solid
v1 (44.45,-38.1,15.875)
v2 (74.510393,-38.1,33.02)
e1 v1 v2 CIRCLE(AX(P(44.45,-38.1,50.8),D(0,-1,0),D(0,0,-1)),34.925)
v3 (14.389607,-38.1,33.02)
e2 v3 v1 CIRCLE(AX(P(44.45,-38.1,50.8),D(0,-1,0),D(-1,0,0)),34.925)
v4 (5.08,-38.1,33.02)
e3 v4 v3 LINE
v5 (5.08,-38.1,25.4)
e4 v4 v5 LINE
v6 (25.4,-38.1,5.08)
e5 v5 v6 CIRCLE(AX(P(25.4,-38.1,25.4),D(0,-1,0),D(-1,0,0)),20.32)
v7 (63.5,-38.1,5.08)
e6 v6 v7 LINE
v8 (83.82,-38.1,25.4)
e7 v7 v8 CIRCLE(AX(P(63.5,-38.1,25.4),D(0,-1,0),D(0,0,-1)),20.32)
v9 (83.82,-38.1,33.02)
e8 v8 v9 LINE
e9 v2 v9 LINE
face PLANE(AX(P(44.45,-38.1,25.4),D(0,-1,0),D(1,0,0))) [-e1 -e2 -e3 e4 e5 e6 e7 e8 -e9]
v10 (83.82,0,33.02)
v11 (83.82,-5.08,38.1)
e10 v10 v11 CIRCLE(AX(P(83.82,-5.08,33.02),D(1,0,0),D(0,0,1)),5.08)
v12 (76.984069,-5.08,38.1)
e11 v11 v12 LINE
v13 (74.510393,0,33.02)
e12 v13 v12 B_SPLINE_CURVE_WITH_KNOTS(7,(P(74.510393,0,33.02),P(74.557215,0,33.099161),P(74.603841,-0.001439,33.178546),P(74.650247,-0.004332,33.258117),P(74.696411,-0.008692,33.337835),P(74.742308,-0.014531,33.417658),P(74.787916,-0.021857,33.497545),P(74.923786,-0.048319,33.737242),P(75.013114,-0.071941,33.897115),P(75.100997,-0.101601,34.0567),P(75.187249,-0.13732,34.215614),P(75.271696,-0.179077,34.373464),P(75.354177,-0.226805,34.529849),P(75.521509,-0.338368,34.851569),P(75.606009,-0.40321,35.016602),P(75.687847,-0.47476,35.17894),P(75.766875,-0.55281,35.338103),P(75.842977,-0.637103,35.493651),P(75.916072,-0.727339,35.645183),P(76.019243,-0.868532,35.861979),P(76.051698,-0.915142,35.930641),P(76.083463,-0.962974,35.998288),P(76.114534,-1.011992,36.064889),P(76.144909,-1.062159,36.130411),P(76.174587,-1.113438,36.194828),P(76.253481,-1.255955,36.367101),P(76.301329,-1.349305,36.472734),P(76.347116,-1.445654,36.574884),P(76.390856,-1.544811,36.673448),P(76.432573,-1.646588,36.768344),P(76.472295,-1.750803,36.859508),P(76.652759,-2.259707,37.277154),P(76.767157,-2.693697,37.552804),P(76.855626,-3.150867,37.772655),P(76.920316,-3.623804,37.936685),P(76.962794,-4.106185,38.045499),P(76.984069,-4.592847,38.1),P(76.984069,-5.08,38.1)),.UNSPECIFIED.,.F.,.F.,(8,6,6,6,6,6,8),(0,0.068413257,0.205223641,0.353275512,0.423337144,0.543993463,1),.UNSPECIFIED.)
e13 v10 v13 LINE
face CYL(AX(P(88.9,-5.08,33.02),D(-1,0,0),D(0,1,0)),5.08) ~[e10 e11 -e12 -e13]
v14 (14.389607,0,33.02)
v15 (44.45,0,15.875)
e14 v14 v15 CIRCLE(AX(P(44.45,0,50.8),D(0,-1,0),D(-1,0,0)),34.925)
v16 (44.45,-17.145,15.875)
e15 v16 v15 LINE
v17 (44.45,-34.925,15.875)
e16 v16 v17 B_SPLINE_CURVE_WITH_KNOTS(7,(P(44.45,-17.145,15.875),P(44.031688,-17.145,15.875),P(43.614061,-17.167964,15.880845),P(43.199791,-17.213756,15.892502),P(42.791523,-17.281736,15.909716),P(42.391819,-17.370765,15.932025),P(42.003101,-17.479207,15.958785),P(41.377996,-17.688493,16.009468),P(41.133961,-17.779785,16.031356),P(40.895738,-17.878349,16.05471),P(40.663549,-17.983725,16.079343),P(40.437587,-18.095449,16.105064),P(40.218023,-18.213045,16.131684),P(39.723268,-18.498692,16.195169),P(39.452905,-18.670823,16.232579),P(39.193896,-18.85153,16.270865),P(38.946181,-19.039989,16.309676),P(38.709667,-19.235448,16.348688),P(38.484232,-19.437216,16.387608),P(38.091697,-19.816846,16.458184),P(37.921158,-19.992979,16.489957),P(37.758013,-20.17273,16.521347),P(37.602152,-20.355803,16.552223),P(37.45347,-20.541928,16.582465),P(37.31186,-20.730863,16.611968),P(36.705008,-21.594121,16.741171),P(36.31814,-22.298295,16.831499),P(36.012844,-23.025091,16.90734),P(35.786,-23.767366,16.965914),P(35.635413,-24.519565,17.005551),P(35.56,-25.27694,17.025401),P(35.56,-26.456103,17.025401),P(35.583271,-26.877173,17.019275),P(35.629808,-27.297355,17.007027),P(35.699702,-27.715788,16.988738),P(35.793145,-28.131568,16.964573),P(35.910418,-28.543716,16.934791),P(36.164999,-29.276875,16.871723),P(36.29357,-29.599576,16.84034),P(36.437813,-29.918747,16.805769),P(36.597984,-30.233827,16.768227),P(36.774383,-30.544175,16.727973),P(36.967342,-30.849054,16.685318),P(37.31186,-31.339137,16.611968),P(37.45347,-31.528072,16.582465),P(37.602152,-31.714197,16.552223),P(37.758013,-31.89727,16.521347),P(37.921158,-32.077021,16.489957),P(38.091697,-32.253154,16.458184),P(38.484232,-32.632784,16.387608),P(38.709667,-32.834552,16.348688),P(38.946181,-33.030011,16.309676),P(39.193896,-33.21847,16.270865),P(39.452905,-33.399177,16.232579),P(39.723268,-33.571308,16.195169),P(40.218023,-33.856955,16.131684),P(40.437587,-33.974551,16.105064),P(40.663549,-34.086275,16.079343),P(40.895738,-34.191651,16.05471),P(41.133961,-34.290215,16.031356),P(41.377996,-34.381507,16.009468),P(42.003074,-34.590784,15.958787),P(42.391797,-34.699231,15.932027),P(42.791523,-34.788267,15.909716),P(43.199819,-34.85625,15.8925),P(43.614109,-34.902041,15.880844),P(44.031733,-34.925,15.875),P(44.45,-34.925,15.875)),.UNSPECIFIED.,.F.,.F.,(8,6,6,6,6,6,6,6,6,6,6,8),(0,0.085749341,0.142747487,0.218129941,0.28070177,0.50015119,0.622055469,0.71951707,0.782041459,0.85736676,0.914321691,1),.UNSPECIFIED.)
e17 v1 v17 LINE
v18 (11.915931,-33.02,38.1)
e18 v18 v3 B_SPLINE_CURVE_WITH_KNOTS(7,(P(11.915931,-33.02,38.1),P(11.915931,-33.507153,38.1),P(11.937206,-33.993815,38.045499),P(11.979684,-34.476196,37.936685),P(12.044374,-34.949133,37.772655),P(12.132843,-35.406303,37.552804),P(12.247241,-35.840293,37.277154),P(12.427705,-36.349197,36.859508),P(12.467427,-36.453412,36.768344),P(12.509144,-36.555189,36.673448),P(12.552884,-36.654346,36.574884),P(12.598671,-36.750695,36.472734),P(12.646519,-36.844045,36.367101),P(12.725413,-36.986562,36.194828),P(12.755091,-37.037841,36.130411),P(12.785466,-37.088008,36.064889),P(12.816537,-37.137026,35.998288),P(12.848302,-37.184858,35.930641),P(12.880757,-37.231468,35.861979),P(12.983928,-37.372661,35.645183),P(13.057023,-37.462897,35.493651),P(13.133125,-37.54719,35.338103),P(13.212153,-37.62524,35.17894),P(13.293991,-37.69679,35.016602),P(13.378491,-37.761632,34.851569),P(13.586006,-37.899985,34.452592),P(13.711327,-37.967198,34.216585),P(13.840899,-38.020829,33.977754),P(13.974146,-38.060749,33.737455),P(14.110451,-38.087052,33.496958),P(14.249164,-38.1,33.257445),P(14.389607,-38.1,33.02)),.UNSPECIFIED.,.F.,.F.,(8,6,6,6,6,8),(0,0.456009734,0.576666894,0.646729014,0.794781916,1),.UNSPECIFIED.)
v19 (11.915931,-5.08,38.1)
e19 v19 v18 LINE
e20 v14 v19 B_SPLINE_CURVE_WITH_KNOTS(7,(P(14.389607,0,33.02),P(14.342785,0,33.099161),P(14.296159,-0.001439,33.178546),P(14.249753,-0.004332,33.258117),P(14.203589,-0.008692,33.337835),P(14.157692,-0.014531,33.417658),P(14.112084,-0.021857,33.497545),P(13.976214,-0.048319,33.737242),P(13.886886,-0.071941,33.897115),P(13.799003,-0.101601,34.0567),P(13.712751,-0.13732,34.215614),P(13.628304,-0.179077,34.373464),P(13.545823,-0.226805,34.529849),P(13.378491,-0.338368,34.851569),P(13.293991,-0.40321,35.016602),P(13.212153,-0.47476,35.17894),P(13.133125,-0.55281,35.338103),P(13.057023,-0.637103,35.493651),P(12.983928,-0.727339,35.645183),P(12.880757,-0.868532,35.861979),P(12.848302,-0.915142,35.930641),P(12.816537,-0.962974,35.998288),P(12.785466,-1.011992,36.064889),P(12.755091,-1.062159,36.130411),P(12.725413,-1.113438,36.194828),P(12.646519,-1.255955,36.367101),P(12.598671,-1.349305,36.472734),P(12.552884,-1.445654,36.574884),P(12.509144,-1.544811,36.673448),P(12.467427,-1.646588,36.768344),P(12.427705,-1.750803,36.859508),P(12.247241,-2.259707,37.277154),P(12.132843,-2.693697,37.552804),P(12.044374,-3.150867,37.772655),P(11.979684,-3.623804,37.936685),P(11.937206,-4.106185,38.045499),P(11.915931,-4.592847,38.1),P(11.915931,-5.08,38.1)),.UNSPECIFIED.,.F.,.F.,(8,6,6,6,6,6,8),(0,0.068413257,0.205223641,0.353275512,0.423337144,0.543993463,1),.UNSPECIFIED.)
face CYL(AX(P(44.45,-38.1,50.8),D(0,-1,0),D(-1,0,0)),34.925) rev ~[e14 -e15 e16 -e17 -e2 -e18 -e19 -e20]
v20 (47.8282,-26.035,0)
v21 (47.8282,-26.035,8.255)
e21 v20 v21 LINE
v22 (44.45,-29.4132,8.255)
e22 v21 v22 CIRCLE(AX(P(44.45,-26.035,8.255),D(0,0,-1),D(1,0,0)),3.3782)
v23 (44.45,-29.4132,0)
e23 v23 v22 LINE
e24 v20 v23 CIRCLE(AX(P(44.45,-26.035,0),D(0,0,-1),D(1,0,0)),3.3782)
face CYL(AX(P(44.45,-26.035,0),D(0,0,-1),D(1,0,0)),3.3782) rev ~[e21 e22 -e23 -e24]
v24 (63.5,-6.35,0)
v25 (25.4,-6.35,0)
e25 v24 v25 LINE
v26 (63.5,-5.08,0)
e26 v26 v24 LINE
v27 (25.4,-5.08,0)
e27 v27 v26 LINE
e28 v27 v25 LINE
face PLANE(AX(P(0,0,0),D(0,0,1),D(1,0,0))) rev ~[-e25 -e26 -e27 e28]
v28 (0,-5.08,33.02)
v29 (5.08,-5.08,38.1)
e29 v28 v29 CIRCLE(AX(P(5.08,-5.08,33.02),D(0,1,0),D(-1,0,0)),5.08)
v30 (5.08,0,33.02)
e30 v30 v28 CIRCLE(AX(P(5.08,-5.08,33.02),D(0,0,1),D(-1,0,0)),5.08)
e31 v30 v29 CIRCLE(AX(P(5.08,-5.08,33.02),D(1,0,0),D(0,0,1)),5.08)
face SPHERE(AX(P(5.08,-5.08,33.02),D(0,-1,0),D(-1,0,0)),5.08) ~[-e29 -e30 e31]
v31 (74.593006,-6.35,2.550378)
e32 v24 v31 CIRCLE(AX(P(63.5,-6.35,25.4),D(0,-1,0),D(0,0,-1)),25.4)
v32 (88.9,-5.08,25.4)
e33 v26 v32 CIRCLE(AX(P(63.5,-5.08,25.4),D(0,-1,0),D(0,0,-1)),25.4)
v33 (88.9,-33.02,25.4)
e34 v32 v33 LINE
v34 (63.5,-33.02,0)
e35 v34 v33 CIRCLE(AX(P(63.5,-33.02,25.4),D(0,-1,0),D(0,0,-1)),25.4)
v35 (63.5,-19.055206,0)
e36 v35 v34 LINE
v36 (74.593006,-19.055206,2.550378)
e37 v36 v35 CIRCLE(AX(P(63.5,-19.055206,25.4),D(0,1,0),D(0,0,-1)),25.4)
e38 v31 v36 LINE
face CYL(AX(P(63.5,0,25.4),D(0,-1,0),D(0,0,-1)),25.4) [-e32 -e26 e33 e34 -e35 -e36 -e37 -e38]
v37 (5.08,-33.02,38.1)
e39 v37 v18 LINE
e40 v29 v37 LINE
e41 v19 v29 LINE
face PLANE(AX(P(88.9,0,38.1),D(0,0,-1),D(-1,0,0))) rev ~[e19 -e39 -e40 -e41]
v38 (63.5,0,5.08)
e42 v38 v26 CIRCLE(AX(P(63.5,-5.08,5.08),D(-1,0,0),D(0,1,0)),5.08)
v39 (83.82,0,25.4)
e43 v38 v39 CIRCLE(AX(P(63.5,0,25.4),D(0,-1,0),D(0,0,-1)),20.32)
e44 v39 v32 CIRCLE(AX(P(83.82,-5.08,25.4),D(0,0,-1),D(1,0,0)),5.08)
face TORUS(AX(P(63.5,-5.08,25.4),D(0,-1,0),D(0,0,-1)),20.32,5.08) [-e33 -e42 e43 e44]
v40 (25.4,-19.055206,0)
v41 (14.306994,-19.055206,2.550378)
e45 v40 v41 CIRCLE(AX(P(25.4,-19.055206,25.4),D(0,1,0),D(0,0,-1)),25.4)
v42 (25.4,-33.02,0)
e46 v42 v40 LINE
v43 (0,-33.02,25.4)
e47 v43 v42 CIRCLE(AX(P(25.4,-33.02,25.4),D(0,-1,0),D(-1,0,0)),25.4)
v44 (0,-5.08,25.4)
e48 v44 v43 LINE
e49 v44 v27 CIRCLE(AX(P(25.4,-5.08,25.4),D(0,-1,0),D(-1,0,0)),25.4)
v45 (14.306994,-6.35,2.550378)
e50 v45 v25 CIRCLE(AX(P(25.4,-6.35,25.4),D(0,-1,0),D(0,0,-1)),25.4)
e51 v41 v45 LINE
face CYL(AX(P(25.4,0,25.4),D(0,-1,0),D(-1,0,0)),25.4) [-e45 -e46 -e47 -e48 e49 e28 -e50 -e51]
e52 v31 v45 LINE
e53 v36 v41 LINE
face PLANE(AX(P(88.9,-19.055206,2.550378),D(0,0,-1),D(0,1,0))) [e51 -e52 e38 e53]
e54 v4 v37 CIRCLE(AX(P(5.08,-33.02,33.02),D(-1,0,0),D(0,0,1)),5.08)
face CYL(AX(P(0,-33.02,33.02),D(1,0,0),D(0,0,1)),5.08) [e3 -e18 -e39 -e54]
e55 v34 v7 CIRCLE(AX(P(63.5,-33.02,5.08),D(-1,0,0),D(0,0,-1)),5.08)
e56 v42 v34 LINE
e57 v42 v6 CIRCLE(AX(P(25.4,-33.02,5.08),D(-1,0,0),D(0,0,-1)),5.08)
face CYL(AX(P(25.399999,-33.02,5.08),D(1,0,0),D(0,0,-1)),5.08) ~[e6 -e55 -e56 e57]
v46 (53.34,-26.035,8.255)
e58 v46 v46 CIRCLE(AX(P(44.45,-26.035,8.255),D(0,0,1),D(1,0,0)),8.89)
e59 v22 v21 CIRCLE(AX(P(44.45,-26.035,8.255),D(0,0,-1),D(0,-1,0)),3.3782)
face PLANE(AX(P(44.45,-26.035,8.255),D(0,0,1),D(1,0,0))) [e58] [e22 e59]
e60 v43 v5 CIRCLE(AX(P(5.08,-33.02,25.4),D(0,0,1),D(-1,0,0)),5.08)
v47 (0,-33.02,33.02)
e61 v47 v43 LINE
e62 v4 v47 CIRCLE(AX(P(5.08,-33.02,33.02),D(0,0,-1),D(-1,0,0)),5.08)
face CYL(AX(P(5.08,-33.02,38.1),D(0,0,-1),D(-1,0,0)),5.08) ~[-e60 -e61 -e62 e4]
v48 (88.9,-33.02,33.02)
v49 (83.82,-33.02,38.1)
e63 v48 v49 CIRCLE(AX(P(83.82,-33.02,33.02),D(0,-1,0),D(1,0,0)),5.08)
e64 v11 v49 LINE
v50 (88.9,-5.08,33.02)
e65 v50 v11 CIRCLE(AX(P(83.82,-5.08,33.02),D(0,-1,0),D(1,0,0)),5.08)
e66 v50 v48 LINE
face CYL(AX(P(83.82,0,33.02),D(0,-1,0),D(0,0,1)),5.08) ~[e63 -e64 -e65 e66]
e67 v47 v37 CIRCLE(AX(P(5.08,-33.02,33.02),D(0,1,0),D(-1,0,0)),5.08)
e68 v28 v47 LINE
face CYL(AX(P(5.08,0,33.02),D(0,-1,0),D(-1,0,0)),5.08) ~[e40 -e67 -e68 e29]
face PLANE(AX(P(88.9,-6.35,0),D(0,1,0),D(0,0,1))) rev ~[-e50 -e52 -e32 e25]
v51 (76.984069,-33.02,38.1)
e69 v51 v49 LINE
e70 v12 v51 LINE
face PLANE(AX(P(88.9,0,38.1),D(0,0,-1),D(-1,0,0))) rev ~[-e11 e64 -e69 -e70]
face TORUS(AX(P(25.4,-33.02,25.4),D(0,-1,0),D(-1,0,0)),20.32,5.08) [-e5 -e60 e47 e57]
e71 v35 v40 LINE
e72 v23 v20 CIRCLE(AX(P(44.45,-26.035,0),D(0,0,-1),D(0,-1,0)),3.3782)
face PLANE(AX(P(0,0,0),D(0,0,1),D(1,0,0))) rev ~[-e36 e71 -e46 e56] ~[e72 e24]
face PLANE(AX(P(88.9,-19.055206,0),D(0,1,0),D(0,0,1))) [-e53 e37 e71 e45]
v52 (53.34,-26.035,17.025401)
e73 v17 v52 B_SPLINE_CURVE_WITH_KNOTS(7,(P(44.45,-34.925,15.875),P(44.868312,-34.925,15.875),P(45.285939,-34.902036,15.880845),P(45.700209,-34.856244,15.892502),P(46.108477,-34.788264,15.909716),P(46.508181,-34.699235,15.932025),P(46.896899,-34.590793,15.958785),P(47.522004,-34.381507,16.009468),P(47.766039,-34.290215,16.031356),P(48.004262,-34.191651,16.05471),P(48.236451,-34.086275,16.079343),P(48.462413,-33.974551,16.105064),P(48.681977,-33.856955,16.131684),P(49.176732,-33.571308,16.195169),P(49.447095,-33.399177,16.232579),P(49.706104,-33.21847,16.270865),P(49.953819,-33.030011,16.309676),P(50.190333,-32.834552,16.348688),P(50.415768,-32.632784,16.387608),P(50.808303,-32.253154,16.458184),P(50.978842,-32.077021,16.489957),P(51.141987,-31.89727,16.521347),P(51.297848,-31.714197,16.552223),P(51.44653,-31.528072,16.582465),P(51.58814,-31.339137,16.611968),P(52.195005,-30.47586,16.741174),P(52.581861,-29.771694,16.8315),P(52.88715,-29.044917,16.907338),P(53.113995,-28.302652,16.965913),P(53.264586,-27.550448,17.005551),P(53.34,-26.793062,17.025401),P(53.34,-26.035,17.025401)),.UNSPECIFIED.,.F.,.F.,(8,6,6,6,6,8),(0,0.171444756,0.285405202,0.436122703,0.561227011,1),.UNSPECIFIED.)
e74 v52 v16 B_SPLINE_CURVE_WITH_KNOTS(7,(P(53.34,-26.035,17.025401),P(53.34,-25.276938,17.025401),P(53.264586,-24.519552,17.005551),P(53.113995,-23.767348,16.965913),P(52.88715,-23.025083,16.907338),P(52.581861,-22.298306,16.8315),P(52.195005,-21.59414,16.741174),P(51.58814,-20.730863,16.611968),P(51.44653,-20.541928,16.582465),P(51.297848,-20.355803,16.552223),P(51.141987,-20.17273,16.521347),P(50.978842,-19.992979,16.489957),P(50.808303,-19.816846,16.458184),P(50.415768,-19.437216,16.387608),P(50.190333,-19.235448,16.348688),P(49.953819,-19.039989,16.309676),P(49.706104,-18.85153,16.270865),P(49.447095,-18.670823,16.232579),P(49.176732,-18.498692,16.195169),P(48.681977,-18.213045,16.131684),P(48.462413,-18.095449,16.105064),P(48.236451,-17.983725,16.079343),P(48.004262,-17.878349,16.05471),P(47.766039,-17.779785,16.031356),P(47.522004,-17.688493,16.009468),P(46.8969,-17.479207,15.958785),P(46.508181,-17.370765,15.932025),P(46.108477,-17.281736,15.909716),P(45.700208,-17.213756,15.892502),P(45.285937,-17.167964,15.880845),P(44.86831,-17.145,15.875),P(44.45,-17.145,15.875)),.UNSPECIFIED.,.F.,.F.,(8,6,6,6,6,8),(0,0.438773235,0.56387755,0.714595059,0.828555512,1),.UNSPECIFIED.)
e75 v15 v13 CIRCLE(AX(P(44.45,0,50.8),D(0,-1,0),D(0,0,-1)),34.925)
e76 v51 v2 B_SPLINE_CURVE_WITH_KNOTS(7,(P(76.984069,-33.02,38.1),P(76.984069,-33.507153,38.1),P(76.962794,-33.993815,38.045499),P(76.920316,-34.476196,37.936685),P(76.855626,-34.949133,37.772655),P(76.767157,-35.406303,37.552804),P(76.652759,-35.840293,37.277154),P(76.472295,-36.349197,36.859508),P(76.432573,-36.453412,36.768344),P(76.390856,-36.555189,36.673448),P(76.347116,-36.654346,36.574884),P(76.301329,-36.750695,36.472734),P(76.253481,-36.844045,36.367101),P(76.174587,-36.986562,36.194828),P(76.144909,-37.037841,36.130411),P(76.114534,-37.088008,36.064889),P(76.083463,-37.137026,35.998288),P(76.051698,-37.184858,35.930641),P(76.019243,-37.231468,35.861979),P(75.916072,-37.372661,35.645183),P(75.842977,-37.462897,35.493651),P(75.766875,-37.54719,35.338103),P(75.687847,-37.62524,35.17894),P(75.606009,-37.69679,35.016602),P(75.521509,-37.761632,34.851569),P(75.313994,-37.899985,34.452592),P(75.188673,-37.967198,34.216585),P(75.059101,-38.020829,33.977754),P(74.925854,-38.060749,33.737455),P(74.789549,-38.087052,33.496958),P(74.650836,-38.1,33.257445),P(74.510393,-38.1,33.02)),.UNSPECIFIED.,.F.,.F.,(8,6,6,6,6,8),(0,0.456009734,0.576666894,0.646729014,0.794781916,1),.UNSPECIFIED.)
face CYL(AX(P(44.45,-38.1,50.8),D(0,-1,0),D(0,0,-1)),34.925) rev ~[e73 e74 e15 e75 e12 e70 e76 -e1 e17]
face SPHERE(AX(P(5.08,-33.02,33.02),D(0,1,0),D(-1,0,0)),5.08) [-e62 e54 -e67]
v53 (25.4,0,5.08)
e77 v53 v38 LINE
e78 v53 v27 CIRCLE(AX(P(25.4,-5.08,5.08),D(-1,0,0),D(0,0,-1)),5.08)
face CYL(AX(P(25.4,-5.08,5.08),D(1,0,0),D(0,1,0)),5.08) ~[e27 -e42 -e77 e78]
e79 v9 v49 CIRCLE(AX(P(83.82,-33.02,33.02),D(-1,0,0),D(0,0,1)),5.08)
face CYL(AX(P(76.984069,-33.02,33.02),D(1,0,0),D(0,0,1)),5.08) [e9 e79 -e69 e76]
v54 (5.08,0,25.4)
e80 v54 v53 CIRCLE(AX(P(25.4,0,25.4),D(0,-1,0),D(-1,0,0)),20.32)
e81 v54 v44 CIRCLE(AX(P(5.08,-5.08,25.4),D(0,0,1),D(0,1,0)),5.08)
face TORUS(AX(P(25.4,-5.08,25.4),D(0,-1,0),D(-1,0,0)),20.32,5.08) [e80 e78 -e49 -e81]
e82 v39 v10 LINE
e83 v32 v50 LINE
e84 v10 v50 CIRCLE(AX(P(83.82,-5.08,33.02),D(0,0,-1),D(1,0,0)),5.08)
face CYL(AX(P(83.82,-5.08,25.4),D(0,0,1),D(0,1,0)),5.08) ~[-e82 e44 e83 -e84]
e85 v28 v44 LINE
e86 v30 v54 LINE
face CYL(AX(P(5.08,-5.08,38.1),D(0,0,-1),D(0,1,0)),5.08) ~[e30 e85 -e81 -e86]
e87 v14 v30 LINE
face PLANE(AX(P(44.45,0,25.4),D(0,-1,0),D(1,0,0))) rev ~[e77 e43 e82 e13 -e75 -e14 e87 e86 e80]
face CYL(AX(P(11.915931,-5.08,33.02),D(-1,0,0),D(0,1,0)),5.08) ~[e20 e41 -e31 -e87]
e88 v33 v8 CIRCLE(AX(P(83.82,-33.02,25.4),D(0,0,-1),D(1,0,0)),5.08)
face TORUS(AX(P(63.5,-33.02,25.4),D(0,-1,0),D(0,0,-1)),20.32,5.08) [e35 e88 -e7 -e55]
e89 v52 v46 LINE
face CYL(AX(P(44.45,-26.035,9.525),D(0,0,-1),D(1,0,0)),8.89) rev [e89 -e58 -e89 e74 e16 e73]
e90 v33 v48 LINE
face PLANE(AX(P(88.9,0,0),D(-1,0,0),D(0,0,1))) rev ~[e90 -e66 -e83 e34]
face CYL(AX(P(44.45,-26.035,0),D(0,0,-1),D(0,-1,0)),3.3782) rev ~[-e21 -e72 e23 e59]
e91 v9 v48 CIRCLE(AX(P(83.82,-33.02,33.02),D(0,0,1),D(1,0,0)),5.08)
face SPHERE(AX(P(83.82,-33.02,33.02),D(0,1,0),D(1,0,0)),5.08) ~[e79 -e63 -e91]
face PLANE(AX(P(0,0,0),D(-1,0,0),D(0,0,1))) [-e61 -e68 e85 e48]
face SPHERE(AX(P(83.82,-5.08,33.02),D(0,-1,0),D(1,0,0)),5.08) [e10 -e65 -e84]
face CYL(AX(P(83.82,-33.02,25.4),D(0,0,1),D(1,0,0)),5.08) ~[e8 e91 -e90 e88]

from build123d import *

# Parameters (mm, degrees)
F0_W      = 88.9
F0_H      = 50.8
F1_DEPTH  = 38.1
F3_DEPTH  = 38.101
F5_DEPTH  = 25.4
F7_R      = 8.89
F8_DEPTH  = 25.4
F9_W      = 12.7052063286
F9_H      = 2.550378209
F10_DEPTH = 207.518
F11_F1_R  = 25.4
F11_F2_R  = 25.4
F12_W     = 88.9
F12_H     = 12.7
F13_DEPTH = 56.642
F14_R     = 5.08
F15_DEPTH = 1.27


with BuildPart() as f1:
    # F0 (on Front) → F1 (new body)
    with BuildSketch(Plane.XZ):
        with Locations((44.45, 25.4)):
            Rectangle(F0_W, F0_H)
    extrude(amount=F1_DEPTH)

    # F2 (on face) → F3 (cut, through all)
    with BuildSketch(Plane.XZ.offset(38.1)):
        with BuildLine():
            ThreePointArc((9.525, 50.8), (19.7542956671, 26.1042956671), (44.45, 15.875))
            Line((44.45, 15.875), (44.45, 50.8))
            Line((44.45, 50.8), (9.525, 50.8))
        make_face()
        with BuildLine():
            Line((44.45, 50.8), (44.45, 15.875))
            ThreePointArc((44.45, 15.875), (69.1457043329, 26.1042956671), (79.375, 50.8))
            Line((79.375, 50.8), (44.45, 50.8))
        make_face()
    extrude(amount=-F3_DEPTH, mode=Mode.SUBTRACT)

    # F4 (on face) → F5 (cut)
    with BuildSketch(Plane(origin=(0, 0, 0), x_dir=(1, 0, 0), z_dir=(0, 0, -1))):
        with BuildLine():
            ThreePointArc((47.8282, 26.035), (46.8387481282, 28.4237481282), (44.45, 29.4132))
            ThreePointArc((44.45, 29.4132), (42.0612518718, 23.6462518718), (47.8282, 26.035))
        make_face()
    extrude(amount=-F5_DEPTH, mode=Mode.SUBTRACT)

    # F7 (on offset) → F8 (cut)
    with BuildSketch(Plane.XY.offset(9.525)):
        with Locations((44.45, -26.035)):
            Circle(F7_R)
    extrude(amount=F8_DEPTH, mode=Mode.SUBTRACT)

    # F9 (on face) → F10 (cut)
    with BuildSketch(Plane.YZ.offset(88.9)):
        with Locations((-12.7026031643, 1.2751891045)):
            Rectangle(F9_W, F9_H)
    extrude(amount=-F10_DEPTH, mode=Mode.SUBTRACT)

    # F11: fillet of radius 25.4 on 4 edges, made by hand

    # F11_f1
    f11_f1_edges = [f1.edges().sort_by_distance(p)[0] for p in [
        (0, -3.175, 0),
    ]]
    fillet(f11_f1_edges, radius=F11_F1_R)

    # F11_f2
    f11_f2_edges = [f1.edges().sort_by_distance(p)[0] for p in [
        (88.9, -3.175, 0),
    ]]
    fillet(f11_f2_edges, radius=F11_F2_R)

    # F12 (on face) → F13 (cut)
    with BuildSketch(Plane(origin=(0, 0, 0), x_dir=(-1, 0, 0), z_dir=(0, 1, 0))):
        with Locations((-44.45, 44.45)):
            Rectangle(F12_W, F12_H)
    extrude(amount=-F13_DEPTH, mode=Mode.SUBTRACT)

    # F14
    f14_edges = [f1.edges().sort_by_distance(p)[0] for p in [
        (0, -19.05, 38.1),
        (88.9, -19.05, 38.1),
        (7.439488, -38.1, 7.439488),
        (7.439488, 0, 7.439488),
        (5.957966, -38.1, 38.1),
        (82.942034, -38.1, 38.1),
        (5.957966, 0, 38.1),
        (82.942034, 0, 38.1),
    ]]
    fillet(f14_edges, radius=F14_R)

    # F15 (cut): a face of the model
    f15_faces = [f1.faces().sort_by_distance(p)[0] for p in [
        (35.8114471714, -26.035, 9.525),
    ]]
    extrude(f15_faces, amount=-F15_DEPTH, mode=Mode.SUBTRACT)


solid = f1.part
